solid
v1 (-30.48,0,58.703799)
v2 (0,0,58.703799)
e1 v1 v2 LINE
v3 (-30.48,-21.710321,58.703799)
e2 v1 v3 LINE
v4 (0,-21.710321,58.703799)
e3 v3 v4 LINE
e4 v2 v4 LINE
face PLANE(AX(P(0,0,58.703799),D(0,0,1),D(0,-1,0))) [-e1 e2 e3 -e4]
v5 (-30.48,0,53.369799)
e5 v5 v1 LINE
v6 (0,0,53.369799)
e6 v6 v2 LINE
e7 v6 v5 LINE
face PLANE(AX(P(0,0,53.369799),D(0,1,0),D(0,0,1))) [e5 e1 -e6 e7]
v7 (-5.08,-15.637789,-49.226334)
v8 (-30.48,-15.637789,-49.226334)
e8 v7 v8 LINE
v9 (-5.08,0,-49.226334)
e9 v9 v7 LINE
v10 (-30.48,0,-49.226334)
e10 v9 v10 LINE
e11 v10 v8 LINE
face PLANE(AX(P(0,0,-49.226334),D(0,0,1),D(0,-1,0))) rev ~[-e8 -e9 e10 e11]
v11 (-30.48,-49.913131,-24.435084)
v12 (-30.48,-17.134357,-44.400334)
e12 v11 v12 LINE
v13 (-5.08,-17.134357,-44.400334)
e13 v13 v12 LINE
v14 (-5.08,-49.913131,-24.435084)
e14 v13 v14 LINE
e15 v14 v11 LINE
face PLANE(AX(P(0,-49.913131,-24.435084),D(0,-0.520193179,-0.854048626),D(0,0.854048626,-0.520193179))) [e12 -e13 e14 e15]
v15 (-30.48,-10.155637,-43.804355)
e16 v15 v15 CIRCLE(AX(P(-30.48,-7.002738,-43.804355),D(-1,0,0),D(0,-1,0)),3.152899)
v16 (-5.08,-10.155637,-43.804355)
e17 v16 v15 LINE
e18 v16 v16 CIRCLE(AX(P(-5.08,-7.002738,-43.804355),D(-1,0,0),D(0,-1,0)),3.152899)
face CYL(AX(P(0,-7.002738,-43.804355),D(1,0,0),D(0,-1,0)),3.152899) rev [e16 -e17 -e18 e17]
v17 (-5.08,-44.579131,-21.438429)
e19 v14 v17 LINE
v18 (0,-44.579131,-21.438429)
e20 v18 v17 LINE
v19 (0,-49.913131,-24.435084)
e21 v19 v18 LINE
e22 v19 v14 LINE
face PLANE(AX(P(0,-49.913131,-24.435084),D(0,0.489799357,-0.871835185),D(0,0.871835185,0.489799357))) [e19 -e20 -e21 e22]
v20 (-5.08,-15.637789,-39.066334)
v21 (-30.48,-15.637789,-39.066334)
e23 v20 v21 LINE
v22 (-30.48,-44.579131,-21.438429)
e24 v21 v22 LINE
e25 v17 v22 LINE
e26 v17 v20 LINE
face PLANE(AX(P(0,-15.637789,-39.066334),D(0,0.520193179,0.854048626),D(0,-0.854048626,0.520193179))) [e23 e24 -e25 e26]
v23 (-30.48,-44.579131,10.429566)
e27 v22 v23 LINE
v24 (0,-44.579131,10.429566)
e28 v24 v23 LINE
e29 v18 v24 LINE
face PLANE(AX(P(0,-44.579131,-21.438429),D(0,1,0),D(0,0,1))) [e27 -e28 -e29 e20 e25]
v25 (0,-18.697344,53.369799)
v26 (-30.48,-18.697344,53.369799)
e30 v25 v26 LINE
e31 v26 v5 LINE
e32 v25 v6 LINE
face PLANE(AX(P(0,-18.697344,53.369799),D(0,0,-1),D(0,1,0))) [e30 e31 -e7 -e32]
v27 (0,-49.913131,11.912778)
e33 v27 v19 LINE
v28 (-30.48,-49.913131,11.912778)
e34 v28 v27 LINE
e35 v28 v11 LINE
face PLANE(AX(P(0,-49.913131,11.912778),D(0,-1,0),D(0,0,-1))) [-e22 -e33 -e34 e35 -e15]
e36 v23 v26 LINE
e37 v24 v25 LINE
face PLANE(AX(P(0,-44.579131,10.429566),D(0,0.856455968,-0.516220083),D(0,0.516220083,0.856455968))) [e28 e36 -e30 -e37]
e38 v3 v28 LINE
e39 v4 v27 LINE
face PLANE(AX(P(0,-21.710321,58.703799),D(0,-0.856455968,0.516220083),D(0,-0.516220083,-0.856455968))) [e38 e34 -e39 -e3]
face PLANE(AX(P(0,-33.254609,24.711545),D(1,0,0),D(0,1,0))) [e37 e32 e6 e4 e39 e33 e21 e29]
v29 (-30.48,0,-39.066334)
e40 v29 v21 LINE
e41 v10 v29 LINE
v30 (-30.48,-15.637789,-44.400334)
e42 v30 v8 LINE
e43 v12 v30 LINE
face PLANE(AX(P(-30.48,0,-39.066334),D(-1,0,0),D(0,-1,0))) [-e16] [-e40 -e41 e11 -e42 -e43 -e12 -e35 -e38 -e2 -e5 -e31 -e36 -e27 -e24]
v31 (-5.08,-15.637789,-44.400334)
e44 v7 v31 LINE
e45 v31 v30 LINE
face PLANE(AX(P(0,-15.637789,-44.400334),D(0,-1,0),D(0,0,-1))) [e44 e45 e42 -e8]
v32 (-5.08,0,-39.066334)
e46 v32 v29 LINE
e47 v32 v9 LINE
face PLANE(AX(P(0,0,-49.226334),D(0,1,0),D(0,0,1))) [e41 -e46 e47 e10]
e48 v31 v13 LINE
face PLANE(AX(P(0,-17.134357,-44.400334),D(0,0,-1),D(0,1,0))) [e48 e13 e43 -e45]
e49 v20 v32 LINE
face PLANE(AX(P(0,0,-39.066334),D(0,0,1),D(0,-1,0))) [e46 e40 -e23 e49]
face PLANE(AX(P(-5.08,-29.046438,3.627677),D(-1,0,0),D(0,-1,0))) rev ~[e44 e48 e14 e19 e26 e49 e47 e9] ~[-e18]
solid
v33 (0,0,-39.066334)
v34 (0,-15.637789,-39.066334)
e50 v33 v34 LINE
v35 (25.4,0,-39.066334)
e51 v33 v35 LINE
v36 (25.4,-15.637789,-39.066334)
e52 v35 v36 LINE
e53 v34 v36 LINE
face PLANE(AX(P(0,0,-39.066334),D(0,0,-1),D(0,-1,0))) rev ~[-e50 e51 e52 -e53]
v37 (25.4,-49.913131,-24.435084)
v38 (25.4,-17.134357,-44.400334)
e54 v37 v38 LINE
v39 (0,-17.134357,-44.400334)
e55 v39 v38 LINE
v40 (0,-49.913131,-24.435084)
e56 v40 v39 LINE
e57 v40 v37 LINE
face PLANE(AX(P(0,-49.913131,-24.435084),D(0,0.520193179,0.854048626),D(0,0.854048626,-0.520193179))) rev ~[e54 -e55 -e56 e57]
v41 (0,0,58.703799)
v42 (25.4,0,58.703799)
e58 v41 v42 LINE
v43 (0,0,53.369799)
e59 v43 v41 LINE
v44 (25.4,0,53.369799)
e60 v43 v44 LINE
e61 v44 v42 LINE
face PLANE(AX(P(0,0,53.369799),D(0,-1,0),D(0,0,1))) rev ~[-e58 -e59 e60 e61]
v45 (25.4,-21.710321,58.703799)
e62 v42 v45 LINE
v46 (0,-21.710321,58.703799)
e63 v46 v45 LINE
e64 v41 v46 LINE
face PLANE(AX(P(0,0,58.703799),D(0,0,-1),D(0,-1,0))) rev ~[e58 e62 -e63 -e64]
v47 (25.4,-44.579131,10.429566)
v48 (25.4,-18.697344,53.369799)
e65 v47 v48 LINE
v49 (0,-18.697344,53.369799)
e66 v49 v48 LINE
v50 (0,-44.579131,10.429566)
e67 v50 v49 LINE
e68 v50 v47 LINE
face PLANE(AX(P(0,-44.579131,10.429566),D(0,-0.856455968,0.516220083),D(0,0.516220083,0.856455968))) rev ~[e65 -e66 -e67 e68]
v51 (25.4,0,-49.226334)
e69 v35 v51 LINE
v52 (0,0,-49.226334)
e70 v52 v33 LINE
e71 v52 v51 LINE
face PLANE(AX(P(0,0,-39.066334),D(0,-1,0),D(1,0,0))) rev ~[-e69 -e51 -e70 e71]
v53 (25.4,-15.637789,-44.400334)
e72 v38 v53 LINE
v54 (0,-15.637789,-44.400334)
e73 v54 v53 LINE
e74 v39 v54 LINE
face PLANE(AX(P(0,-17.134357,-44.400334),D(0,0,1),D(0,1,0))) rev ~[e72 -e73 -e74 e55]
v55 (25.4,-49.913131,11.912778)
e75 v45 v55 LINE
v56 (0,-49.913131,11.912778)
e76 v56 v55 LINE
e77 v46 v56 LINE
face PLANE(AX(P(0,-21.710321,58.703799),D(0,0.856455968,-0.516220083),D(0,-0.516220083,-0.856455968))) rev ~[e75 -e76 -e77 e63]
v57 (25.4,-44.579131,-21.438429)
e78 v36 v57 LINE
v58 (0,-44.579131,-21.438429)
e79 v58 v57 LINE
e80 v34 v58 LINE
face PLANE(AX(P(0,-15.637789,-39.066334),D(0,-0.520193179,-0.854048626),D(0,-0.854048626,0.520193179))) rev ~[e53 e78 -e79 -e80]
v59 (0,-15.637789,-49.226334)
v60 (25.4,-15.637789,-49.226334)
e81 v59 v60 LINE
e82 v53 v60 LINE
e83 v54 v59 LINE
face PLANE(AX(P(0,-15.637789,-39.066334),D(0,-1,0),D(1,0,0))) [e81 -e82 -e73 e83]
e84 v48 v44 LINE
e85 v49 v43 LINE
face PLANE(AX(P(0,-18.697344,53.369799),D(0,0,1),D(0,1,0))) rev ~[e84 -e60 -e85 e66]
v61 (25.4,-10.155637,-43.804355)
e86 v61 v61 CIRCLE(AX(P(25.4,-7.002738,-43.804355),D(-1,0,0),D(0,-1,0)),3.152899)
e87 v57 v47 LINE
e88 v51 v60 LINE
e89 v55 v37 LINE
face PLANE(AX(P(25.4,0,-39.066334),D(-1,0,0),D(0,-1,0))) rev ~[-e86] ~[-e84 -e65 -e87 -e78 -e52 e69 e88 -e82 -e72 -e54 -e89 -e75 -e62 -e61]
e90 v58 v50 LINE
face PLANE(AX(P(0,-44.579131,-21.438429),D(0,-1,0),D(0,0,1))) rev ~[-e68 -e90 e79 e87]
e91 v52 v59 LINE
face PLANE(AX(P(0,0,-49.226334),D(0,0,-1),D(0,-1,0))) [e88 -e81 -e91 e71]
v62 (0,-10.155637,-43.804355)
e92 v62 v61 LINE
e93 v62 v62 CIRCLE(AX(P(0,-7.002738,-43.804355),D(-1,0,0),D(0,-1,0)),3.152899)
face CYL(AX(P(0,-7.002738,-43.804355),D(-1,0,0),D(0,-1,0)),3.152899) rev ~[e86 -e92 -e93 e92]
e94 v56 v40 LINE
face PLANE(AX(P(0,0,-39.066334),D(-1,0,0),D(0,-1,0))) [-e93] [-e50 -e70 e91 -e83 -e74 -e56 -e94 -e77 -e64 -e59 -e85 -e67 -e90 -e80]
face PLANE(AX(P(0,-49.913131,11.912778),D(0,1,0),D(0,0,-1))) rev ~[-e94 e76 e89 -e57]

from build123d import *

# Parameters (mm, degrees)
F1_DEPTH = 25.4
F2_DEPTH = 10.16
F3_R     = 3.1528992533
F4_DEPTH = 25.4
F5_DEPTH = 30.48
F6_DEPTH = 5.08
F7_DEPTH = 5.08


with BuildPart() as f1:
    # F0 (on Right) → F1 (new body)
    with BuildSketch(Plane.YZ):
        Polygon((0, 53.3697988007), (0, 58.7037988007), (-21.7103212485, 58.7037988007), (-49.9131307006, 11.9127783076), (-49.9131307006, -24.4350843132), (-44.5791307006, -21.4384287332), (-44.5791307006, 10.4295662253), (-18.6973443152, 53.3697988007), align=None)
        Polygon((-44.5791307006, -21.4384287332), (-49.9131307006, -24.4350843132), (-17.1343572438, -44.4003343582), (0, -44.4003343582), (0, -39.0663343582), (-15.6377889345, -39.0663343582), align=None)
    extrude(amount=F1_DEPTH)

    # F2 (add): a face of the model
    f2_faces = [f1.faces().sort_by_distance(p)[0] for p in [
        (12.7, -7.8188944672, -39.0663343582),
    ]]
    extrude(f2_faces, amount=-F2_DEPTH)

    # F3 (on face) → F4 (cut)
    with BuildSketch(Plane(origin=(0, 0, 0), x_dir=(0, -1, 0), z_dir=(-1, 0, 0))):
        with Locations((7.0027378388, -43.8043549657)):
            Circle(F3_R)
    extrude(amount=-F4_DEPTH, mode=Mode.SUBTRACT)


with BuildPart() as f5:
    # F5 (new): a face of the model
    f5_faces = [f1.part.faces().sort_by_distance(p)[0] for p in [
        (0, -32.6566725698, 32.5135338393),
    ]]
    extrude(f5_faces, amount=F5_DEPTH)

    # F3 (on face) → F6 (cut)
    with BuildSketch(Plane(origin=(0, 0, 0), x_dir=(0, -1, 0), z_dir=(-1, 0, 0))):
        Polygon((0, 53.3697988007), (18.6973443152, 53.3697988007), (44.5791307006, 10.4295662253), (44.5791307006, -21.4384287332), (15.6377889345, -39.0663343582), (0, -39.0663343582), (0, -49.2263343582), (15.6377889345, -49.2263343582), (15.6377889345, -44.4003343582), (17.1343572438, -44.4003343582), (49.9131307006, -24.4350843132), (49.9131307006, 11.9127783076), (21.7103212485, 58.7037988007), (0, 58.7037988007), align=None)
        with Locations((7.0027378388, -43.8043549657)):
            Circle(F3_R, mode=Mode.SUBTRACT)
    extrude(amount=F6_DEPTH, mode=Mode.SUBTRACT)

    # F0 (on Right) → F7 (join)
    with BuildSketch(Plane.YZ):
        Polygon((0, 53.3697988007), (0, 58.7037988007), (-21.7103212485, 58.7037988007), (-49.9131307006, 11.9127783076), (-49.9131307006, -24.4350843132), (-44.5791307006, -21.4384287332), (-44.5791307006, 10.4295662253), (-18.6973443152, 53.3697988007), align=None)
    extrude(amount=-F7_DEPTH)


solid = Compound([f1.part, f5.part])
